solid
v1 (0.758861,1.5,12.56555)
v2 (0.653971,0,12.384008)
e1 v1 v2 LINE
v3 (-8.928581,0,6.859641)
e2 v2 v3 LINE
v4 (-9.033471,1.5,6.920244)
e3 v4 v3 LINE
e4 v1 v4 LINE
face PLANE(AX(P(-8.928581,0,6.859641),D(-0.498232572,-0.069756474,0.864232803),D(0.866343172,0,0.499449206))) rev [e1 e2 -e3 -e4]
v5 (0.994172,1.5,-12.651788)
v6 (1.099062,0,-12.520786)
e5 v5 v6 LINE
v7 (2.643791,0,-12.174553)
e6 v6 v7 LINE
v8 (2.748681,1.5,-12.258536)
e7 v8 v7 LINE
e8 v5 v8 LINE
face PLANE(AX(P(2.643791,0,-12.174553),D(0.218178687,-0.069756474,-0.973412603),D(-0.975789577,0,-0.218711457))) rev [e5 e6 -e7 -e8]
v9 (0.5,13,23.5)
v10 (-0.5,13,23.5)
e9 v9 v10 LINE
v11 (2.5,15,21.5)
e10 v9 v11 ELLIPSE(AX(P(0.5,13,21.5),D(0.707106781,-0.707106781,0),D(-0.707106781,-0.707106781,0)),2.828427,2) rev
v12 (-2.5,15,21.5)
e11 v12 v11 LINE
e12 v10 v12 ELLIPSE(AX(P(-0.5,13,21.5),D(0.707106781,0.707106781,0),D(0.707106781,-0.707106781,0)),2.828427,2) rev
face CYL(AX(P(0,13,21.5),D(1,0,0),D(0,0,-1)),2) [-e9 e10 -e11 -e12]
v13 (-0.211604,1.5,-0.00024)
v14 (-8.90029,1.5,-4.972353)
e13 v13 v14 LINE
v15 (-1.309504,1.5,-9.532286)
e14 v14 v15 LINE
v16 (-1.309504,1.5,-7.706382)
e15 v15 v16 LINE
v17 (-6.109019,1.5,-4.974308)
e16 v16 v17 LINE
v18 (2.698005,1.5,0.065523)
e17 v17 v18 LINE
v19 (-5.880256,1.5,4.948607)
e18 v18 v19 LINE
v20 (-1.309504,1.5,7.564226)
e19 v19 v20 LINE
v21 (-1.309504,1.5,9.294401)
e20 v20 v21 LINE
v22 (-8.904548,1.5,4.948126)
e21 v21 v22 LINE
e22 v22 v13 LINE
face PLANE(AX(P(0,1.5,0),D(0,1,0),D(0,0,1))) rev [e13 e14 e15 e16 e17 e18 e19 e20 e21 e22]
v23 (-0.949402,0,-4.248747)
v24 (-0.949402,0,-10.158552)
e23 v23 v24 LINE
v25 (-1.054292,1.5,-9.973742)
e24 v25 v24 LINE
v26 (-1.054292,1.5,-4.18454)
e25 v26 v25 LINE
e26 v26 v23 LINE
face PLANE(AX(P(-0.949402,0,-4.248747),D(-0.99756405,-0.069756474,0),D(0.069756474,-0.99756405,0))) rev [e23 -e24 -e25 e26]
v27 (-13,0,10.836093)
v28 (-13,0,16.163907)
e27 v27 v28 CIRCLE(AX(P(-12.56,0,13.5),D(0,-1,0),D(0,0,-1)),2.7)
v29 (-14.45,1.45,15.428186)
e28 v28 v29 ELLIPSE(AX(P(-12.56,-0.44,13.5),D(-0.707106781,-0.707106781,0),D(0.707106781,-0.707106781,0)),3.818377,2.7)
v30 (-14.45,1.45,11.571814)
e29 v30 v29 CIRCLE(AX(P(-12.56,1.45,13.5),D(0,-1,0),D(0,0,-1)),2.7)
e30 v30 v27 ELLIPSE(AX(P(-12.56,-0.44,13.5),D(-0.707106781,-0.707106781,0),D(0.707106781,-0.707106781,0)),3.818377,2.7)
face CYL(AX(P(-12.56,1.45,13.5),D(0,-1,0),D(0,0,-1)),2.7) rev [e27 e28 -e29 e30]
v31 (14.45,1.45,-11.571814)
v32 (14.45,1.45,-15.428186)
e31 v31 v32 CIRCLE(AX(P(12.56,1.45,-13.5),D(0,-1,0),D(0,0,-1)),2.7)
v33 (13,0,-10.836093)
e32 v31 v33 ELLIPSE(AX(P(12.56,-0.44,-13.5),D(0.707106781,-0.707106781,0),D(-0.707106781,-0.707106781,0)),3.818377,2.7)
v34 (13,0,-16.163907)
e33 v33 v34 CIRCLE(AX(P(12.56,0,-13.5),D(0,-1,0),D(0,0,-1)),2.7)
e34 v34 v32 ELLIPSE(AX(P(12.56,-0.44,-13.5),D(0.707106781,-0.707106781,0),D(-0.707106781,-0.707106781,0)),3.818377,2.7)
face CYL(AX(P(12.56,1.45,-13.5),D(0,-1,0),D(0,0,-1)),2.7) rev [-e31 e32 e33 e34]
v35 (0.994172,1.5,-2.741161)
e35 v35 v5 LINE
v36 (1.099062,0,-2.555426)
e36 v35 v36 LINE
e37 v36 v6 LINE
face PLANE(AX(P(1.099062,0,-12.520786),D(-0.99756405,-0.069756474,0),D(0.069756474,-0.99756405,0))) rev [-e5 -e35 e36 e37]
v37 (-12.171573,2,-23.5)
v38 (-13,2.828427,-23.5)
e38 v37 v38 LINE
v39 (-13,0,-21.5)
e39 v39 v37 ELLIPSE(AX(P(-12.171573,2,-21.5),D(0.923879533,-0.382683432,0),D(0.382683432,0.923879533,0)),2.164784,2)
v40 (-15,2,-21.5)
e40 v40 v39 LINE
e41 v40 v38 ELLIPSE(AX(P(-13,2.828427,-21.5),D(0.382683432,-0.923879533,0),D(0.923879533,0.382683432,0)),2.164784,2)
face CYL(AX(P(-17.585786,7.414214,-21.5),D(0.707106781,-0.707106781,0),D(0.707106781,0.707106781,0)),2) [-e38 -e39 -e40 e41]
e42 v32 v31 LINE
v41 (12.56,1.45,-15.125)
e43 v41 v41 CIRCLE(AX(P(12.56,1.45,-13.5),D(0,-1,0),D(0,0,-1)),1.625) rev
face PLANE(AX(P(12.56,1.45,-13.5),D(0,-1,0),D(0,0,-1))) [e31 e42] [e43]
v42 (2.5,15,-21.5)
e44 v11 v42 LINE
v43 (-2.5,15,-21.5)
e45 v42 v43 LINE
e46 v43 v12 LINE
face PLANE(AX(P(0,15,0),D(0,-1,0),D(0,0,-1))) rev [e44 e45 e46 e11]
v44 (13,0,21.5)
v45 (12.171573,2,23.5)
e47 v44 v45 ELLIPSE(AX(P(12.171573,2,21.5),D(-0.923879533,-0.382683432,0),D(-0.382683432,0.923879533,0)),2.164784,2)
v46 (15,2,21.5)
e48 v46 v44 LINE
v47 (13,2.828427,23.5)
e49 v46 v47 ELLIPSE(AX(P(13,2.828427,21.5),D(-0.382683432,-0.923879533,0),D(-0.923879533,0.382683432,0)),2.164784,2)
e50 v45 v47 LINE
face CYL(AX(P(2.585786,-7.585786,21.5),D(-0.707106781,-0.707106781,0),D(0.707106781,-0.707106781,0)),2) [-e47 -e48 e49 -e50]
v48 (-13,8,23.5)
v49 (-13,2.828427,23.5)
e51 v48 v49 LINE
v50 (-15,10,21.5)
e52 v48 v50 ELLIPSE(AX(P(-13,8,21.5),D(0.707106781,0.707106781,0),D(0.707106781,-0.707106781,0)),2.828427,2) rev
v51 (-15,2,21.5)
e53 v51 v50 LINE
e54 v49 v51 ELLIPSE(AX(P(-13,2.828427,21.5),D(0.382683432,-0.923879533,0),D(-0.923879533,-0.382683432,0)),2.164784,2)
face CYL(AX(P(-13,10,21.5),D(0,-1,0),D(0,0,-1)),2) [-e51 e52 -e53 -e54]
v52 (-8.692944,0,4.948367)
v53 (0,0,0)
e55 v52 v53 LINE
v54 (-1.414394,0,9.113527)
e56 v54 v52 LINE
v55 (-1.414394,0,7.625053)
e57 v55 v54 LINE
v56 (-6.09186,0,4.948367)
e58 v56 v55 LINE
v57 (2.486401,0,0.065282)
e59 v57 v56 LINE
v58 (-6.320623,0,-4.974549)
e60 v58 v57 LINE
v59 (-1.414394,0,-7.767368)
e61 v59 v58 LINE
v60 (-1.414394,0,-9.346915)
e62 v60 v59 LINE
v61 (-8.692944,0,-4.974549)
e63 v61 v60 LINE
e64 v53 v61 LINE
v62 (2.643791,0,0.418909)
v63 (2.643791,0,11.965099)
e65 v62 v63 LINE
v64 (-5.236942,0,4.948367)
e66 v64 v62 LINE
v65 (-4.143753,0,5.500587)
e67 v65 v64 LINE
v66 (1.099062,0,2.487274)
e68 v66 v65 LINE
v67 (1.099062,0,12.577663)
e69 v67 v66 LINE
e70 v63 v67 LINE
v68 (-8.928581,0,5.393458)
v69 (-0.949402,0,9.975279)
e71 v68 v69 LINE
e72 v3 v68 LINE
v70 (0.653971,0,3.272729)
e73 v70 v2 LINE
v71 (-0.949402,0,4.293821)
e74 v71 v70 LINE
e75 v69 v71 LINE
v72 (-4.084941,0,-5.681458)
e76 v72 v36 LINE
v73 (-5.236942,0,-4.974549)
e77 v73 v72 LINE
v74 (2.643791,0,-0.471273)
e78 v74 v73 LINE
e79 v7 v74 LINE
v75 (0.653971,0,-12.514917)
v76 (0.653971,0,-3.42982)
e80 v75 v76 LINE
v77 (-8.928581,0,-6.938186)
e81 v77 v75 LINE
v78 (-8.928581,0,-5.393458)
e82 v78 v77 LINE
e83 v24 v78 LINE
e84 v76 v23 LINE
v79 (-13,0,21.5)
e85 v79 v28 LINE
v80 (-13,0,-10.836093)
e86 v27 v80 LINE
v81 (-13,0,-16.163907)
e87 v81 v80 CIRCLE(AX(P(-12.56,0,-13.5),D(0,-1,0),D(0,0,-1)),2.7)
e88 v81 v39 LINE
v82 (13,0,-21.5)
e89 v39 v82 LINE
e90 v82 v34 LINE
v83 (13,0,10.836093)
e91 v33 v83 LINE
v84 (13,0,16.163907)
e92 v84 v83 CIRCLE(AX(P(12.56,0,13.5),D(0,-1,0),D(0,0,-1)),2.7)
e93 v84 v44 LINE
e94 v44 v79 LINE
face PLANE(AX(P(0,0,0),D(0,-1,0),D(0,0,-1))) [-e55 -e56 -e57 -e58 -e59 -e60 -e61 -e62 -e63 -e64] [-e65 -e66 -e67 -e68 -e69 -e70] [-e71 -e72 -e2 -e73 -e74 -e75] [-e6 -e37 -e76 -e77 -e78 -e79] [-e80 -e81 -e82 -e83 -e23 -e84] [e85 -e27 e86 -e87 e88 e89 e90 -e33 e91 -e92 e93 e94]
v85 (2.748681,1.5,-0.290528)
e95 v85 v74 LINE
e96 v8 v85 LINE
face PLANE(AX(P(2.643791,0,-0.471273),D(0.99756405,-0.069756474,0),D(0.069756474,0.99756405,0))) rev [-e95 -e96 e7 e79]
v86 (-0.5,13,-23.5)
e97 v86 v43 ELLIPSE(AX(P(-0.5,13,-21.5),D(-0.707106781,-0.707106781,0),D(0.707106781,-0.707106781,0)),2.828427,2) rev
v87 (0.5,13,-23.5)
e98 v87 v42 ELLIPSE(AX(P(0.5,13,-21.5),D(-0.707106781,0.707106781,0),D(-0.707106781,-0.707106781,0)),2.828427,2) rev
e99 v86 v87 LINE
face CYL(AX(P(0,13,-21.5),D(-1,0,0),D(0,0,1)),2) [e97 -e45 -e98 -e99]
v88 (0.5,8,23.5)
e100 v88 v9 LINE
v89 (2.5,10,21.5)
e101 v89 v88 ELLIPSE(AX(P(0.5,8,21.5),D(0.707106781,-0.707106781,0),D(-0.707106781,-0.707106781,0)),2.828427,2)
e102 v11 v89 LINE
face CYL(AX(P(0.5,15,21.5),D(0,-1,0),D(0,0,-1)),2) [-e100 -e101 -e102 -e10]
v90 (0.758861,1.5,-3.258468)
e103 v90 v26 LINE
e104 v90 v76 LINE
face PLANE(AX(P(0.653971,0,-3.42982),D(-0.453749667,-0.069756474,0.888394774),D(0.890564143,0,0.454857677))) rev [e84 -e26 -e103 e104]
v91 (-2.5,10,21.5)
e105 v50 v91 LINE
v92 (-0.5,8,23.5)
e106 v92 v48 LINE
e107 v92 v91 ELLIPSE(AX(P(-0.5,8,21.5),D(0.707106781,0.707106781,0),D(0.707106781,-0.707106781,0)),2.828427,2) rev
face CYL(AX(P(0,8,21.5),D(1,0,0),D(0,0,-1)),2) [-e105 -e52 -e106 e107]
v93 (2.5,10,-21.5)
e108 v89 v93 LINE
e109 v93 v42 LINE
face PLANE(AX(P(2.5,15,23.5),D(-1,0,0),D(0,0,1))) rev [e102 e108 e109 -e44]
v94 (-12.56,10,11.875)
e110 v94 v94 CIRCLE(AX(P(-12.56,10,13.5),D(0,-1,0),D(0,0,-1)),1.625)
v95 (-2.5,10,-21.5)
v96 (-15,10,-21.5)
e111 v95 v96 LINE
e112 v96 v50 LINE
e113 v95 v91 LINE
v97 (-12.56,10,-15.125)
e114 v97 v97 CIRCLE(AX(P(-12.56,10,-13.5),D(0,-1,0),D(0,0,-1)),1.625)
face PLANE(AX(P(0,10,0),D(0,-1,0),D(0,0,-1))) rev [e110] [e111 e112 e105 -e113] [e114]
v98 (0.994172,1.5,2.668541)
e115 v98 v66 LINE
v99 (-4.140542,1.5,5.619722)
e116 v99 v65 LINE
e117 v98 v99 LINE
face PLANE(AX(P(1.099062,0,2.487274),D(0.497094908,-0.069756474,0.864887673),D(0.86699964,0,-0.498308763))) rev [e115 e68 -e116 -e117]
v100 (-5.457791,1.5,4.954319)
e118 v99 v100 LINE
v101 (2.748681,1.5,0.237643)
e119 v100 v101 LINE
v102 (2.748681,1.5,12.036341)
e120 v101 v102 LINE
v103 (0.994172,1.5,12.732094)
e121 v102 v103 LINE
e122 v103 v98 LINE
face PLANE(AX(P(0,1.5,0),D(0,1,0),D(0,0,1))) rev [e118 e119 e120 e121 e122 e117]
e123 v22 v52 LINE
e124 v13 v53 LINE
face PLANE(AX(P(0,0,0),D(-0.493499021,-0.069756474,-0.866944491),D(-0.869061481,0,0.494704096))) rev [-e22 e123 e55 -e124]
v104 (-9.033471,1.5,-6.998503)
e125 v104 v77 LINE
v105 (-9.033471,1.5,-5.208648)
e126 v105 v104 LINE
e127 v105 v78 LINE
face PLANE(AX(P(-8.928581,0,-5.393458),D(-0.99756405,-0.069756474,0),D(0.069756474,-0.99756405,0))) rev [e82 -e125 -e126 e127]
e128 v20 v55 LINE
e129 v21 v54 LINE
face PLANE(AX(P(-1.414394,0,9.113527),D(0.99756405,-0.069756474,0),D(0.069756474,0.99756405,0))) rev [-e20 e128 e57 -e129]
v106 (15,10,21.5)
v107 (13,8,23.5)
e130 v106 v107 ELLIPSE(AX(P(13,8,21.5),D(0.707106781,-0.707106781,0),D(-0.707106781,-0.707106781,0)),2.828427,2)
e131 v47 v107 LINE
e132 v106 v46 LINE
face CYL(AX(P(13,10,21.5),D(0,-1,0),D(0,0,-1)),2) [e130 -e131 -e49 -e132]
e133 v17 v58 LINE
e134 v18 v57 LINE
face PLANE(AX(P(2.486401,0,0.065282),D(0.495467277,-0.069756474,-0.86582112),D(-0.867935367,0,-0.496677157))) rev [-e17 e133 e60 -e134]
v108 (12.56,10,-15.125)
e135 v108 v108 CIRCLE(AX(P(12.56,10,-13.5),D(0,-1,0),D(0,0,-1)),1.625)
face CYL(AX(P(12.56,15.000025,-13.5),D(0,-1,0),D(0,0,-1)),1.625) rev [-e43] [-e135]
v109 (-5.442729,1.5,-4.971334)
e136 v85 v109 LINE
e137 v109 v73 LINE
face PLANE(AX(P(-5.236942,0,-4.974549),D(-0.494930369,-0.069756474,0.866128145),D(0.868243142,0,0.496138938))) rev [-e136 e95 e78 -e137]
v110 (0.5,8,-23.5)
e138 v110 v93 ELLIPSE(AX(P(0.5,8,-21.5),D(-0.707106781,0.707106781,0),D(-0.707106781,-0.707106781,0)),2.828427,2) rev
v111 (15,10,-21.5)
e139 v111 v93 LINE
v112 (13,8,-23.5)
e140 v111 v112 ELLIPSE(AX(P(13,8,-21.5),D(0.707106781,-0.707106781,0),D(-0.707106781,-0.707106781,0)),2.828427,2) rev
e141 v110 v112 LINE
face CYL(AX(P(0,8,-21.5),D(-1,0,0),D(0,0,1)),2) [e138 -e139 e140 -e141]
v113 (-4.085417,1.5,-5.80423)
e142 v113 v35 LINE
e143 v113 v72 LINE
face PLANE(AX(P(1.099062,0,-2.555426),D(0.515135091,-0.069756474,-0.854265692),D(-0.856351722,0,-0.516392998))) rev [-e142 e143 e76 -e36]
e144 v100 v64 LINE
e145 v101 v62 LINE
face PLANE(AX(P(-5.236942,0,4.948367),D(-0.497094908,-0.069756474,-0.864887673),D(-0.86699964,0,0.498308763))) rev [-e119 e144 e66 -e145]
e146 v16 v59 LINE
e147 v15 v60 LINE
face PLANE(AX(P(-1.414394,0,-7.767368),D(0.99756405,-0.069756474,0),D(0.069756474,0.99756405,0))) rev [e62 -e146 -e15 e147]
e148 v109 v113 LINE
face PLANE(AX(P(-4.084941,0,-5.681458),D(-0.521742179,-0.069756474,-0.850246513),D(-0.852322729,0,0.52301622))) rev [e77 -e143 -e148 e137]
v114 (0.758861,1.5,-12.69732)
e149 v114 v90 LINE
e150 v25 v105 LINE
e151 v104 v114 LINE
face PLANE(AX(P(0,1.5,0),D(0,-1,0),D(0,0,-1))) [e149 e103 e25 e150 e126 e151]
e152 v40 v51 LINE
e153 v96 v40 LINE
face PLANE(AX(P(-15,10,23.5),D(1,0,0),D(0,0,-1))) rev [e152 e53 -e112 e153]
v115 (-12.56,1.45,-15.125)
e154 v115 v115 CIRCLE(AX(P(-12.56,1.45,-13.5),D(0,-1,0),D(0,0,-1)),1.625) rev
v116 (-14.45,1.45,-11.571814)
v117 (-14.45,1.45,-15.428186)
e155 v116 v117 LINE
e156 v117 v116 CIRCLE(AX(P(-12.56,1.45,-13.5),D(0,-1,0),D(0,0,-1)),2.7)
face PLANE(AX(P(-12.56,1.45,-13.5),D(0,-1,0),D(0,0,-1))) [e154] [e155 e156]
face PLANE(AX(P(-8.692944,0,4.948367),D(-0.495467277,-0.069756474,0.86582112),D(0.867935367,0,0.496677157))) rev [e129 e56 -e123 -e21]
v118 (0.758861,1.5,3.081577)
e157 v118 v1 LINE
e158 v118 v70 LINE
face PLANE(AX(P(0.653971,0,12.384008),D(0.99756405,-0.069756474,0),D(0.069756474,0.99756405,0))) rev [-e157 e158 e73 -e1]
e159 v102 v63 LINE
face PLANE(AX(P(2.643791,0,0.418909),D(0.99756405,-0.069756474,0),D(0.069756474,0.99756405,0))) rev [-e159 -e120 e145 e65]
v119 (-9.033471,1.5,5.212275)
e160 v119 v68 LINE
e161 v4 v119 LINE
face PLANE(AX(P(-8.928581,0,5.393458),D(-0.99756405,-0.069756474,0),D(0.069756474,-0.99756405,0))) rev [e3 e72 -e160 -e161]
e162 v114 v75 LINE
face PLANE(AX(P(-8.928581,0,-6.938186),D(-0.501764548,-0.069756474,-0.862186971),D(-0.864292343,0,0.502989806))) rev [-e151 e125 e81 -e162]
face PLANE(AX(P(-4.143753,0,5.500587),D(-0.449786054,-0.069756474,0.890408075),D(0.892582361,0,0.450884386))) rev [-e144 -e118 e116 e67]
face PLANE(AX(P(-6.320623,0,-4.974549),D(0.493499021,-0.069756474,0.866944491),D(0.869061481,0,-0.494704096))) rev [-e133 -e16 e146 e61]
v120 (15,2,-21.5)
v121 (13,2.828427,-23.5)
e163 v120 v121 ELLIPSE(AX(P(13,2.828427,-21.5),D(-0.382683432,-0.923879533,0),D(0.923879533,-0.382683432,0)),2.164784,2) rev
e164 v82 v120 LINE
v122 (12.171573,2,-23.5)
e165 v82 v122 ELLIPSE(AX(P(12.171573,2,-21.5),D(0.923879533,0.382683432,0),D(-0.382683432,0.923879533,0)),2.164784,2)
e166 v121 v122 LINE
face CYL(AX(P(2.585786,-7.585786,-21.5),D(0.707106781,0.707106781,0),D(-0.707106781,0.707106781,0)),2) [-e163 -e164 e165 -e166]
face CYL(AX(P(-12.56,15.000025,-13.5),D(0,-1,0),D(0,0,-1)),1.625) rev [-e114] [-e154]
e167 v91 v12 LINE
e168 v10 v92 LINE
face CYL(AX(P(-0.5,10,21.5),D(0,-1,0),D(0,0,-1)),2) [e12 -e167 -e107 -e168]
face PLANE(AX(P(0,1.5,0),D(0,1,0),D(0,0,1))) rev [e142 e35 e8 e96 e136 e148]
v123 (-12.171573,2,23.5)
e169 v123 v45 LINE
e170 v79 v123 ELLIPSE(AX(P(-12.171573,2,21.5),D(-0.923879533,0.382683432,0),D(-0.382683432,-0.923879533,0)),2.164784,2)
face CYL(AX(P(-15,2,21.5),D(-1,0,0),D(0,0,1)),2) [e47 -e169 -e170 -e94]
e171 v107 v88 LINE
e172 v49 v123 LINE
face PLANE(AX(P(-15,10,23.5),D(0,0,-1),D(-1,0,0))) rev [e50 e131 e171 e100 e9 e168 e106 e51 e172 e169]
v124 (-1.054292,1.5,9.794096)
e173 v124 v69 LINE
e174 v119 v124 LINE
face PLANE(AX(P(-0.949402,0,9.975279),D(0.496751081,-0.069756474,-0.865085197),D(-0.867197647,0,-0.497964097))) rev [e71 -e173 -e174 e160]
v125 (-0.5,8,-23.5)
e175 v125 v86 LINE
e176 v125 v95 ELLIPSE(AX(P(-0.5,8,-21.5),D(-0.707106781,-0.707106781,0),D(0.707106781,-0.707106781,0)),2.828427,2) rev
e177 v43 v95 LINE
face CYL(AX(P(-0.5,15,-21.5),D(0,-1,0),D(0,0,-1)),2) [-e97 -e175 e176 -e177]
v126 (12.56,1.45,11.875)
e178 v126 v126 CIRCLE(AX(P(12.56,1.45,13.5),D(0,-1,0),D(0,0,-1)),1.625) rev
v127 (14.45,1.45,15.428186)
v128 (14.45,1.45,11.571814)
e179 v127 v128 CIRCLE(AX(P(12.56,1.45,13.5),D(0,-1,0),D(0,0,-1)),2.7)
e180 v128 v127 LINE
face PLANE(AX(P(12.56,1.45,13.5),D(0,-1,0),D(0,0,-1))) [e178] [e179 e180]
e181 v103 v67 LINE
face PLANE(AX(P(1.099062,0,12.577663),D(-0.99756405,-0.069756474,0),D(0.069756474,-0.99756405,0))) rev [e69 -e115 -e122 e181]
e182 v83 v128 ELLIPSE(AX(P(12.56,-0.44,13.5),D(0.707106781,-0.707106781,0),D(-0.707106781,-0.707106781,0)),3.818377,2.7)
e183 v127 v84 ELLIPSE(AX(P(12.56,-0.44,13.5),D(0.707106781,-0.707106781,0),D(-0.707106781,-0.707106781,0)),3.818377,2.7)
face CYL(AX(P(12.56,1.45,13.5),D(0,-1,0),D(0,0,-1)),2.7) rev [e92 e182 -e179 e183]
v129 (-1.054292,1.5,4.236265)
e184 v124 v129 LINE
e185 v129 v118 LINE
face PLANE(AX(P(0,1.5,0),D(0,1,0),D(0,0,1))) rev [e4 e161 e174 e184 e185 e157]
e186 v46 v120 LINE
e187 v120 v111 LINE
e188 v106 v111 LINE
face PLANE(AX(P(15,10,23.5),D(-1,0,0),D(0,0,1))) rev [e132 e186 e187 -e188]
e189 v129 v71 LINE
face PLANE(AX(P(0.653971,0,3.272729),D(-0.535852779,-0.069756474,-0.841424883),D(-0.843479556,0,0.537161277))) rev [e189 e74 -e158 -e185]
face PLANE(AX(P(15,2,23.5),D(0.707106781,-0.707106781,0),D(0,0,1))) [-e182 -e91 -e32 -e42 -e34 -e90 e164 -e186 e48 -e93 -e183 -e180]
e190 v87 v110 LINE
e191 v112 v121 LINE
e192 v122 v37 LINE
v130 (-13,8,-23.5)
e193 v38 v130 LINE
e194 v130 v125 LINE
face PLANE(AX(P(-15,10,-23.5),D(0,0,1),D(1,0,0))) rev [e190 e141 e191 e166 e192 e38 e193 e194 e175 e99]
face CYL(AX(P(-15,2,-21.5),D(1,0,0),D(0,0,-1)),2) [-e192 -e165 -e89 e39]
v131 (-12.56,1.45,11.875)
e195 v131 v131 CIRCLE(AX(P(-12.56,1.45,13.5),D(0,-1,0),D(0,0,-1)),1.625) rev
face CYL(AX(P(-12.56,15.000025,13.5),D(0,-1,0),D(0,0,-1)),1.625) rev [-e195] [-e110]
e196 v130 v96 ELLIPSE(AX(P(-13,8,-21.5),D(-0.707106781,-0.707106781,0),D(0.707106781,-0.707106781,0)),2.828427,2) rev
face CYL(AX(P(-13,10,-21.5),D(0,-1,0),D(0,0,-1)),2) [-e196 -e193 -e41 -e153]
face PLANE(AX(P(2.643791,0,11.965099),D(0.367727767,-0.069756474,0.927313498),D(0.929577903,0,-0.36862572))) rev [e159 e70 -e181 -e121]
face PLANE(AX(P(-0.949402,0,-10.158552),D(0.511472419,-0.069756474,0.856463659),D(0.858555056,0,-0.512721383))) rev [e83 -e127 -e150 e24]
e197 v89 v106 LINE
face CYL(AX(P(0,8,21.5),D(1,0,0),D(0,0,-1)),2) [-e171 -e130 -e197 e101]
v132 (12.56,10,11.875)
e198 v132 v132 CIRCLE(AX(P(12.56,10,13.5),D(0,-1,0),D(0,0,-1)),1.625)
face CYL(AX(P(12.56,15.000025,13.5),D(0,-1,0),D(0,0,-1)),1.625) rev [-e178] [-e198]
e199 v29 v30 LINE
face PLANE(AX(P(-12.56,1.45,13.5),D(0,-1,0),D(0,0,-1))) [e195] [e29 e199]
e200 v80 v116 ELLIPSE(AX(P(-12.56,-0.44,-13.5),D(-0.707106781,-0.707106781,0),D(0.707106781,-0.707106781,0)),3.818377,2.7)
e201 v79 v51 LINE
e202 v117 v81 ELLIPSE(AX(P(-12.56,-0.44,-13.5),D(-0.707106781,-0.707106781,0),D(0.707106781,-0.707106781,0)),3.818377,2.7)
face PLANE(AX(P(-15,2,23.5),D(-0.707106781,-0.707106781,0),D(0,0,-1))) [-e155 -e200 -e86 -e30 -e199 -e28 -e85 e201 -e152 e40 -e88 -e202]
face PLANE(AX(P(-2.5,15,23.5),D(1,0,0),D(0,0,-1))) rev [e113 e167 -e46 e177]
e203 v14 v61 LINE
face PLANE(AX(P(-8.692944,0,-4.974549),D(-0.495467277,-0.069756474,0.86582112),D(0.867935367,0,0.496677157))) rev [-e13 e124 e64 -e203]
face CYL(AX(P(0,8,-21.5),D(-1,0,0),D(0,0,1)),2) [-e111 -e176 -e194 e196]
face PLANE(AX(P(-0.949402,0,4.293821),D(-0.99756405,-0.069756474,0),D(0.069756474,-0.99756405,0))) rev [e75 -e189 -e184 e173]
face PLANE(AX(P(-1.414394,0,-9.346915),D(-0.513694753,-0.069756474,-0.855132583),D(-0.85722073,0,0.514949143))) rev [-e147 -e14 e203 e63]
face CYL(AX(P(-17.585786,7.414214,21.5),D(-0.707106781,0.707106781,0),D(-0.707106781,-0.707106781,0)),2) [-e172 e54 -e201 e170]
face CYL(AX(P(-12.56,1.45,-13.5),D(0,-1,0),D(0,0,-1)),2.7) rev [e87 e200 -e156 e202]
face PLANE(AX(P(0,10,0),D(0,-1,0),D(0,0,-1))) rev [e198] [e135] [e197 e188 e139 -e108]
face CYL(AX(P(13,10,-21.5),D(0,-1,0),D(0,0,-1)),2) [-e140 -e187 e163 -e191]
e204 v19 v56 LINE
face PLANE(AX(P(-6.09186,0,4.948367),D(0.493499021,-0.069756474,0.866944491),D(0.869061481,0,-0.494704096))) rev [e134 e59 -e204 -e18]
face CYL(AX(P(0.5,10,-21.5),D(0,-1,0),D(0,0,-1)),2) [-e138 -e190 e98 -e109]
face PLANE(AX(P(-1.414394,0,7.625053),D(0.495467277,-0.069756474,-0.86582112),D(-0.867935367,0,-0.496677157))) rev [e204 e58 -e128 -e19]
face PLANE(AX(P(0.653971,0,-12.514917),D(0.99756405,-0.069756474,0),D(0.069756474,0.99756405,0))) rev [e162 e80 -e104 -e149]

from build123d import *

# Parameters (mm, degrees)
SKETCH1_W                    = 30
SKETCH1_H                    = 47
BOSS_EXTRUDE1_DEPTH          = 10
SKETCH2_W                    = 5
SKETCH2_H                    = 47
BOSS_EXTRUDE2_DEPTH          = 5
SKETCH3_R                    = 1.625
CUT_EXTRUDE1_DEPTH           = 32.658332237
SKETCH4_R                    = 2.7
CUT_EXTRUDE2_DEPTH           = 1.45
CHAMFER1_SIZE                = 2
CHAMFER2_SIZE                = 2
FILLET1_R                    = 2
FILLET2_R                    = 2
CUT_EXTRUDE6_DEPTH           = 1.5
CUT_EXTRUDE6_DRAFT           = 4
CUT_EXTRUDE6_PROFILE_2_DEPTH = 1.5
CUT_EXTRUDE6_PROFILE_2_DRAFT = 4
CUT_EXTRUDE6_PROFILE_3_DEPTH = 1.5
CUT_EXTRUDE6_PROFILE_3_DRAFT = 4
CUT_EXTRUDE6_PROFILE_4_DEPTH = 1.5
CUT_EXTRUDE6_PROFILE_4_DRAFT = 4
CUT_EXTRUDE6_PROFILE_5_DEPTH = 1.5
CUT_EXTRUDE6_PROFILE_5_DRAFT = 4


with BuildPart() as part:
    # Sketch1 → Boss-Extrude1 (new body)
    with BuildSketch(Plane(origin=(0, 0, 0), x_dir=(1, 0, 0), z_dir=(0, 1, 0))):
        Rectangle(SKETCH1_W, SKETCH1_H)
    extrude(amount=BOSS_EXTRUDE1_DEPTH)

    # Sketch2 → Boss-Extrude2 (add)
    with BuildSketch(Plane(origin=(0, 10, 0), x_dir=(1, 0, 0), z_dir=(0, 1, 0))):
        Rectangle(SKETCH2_W, SKETCH2_H)
    extrude(amount=BOSS_EXTRUDE2_DEPTH)

    # Sketch3 → Cut-Extrude1 (cut, through all)
    with BuildSketch(Plane.XZ):
        with Locations(Location((-12.56, 13.5, 0), (0, 0, 270))):
            Circle(SKETCH3_R)
        with Locations(Location((-12.56, -13.5, 0), (0, 0, 270))):
            Circle(SKETCH3_R)
        with Locations(Location((12.56, -13.5, 0), (0, 0, 270))):
            Circle(SKETCH3_R)
        with Locations(Location((12.56, 13.5, 0), (0, 0, 270))):
            Circle(SKETCH3_R)
    extrude(amount=-CUT_EXTRUDE1_DEPTH, mode=Mode.SUBTRACT)

    # Sketch4 → Cut-Extrude2 (cut)
    with BuildSketch(Plane.XZ):
        with Locations((-12.56, 13.5)):
            Circle(SKETCH4_R)
        with Locations((-12.56, -13.5)):
            Circle(SKETCH4_R)
        with Locations((12.56, -13.5)):
            Circle(SKETCH4_R)
        with Locations((12.56, 13.5)):
            Circle(SKETCH4_R)
    extrude(amount=-CUT_EXTRUDE2_DEPTH, mode=Mode.SUBTRACT)

    # Chamfer1
    # the kernel refuses this chamfer: 2 mm, written as the material it takes off along each edge
    with BuildSketch(Plane(origin=(-15, 0, -28.643365976), x_dir=(0.9996219169112968, -0.027495876610586365, 0), z_dir=(0, 0, 1)), Plane(origin=(-15, 0, 9.512661705), x_dir=(0.9996219169112968, -0.027495876610586365, 0), z_dir=(0, 0, 1))) as chamfer1_piece_1:
        Polygon((CHAMFER1_SIZE * 0.999621916911, CHAMFER1_SIZE * 0.0274958766106), (-CHAMFER1_SIZE * 0.0274958766106, CHAMFER1_SIZE * 0.999621916911), (0, 0), align=None)
    extrude(amount=19.130704271, mode=Mode.SUBTRACT)
    with BuildSketch(Plane(origin=(-15, 0, -17.487338295), x_dir=(0.9996219169112968, -0.027495876610586365, 0), z_dir=(0, 0, 1))) as chamfer1_piece_2:
        Polygon((CHAMFER1_SIZE * 0.999621916911, CHAMFER1_SIZE * 0.0274958766106), (-CHAMFER1_SIZE * 0.0274958766106, CHAMFER1_SIZE * 0.999621916911), (0, 0), align=None)
    extrude(amount=34.974676589, mode=Mode.SUBTRACT)

    # Chamfer2
    # the kernel refuses this chamfer: 2 mm, written as the material it takes off along each edge
    with BuildSketch(Plane(origin=(15, 0, 28.643365976), x_dir=(0.027495876610586494, 0.9996219169112968, 0), z_dir=(0, 0, -1)), Plane(origin=(15, 0, -9.512661705), x_dir=(0.027495876610586494, 0.9996219169112968, 0), z_dir=(0, 0, -1))) as chamfer2_piece_1:
        Polygon((CHAMFER2_SIZE * 0.999621916911, -CHAMFER2_SIZE * 0.0274958766106), (-CHAMFER2_SIZE * 0.0274958766106, -CHAMFER2_SIZE * 0.999621916911), (0, 0), align=None)
    extrude(amount=19.130704271, mode=Mode.SUBTRACT)
    with BuildSketch(Plane(origin=(15, 0, 17.487338295), x_dir=(0.027495876610586494, 0.9996219169112968, 0), z_dir=(0, 0, -1))) as chamfer2_piece_2:
        Polygon((CHAMFER2_SIZE * 0.999621916911, -CHAMFER2_SIZE * 0.0274958766106), (-CHAMFER2_SIZE * 0.0274958766106, -CHAMFER2_SIZE * 0.999621916911), (0, 0), align=None)
    extrude(amount=34.974676589, mode=Mode.SUBTRACT)

    # Fillet1
    fillet1_edges = [part.edges().sort_by_distance(p)[0] for p in [
        (-14, 1, 23.5),
        (-15, 6, 23.5),
        (-8.75, 10, 23.5),
        (-2.5, 12.5, 23.5),
        (0, 15, 23.5),
        (2.5, 12.5, 23.5),
        (8.75, 10, 23.5),
        (15, 6, 23.5),
        (14, 1, 23.5),
        (0, 0, 23.5),
    ]]
    fillet(fillet1_edges, radius=FILLET1_R)

    # Fillet2
    fillet2_edges = [part.edges().sort_by_distance(p)[0] for p in [
        (8.75, 10, -23.5),
        (2.5, 12.5, -23.5),
        (0, 15, -23.5),
        (-2.5, 12.5, -23.5),
        (-8.75, 10, -23.5),
        (-15, 6, -23.5),
        (-14, 1, -23.5),
        (0, 0, -23.5),
        (14, 1, -23.5),
        (15, 6, -23.5),
    ]]
    fillet(fillet2_edges, radius=FILLET2_R)


with BuildPart() as cut_extrude6_tool:
    # Mobious Logo → Cut-Extrude6 (with draft: the straight prism first)
    with BuildSketch(Plane.XZ):
        Polygon((-8.928580544, -5.393458037), (-8.928580544, -6.93818631), (0.653971114, -12.514917192), (0.653971114, -3.429820402), (-0.949401841, -4.248746813), (-0.949401841, -10.158552031), align=None)
    extrude(amount=-CUT_EXTRUDE6_DEPTH)
    # Cut-Extrude6: the draft: its side faces are tilted about the plane it starts from
    cut_extrude6_sides = [cut_extrude6_tool.faces().sort_by_distance(p)[0] for p in [
        (-8.928580544, 0.75, -6.165822173),
        (-4.137304715, 0.75, -9.726551751),
        (0.653971114, 0.75, -7.972368797),
        (-0.147715364, 0.75, -3.839283608),
        (-0.949401841, 0.75, -7.203649422),
        (-4.938991193, 0.75, -7.776005034),
    ]]
    draft(cut_extrude6_sides, Plane.XZ, CUT_EXTRUDE6_DRAFT)


with BuildPart() as part_1:
    add(part.part)

    # Cut-Extrude6: cut by cut_extrude6_tool
    add(cut_extrude6_tool.part, mode=Mode.SUBTRACT)


with BuildPart() as cut_extrude6_profile_2_tool:
    # Mobious Logo → Cut-Extrude6 profile 2 (with draft: the straight prism first)
    with BuildSketch(Plane.XZ):
        Polygon((-4.084941045, -5.681458223), (1.099062311, -2.555426049), (1.099062311, -12.520785535), (2.643790584, -12.174553336), (2.643790584, -0.471273032), (-5.23694179, -4.974548675), align=None)
    extrude(amount=-CUT_EXTRUDE6_PROFILE_2_DEPTH)
    # Cut-Extrude6 profile 2: the draft: its side faces are tilted about the plane it starts from
    cut_extrude6_profile_2_sides = [cut_extrude6_profile_2_tool.faces().sort_by_distance(p)[0] for p in [
        (-1.492939367, 0.75, -4.118442136),
        (1.099062311, 0.75, -7.538105792),
        (1.871426448, 0.75, -12.347669435),
        (2.643790584, 0.75, -6.322913184),
        (-1.296575603, 0.75, -2.722910854),
        (-4.660941418, 0.75, -5.328003449),
    ]]
    draft(cut_extrude6_profile_2_sides, Plane.XZ, CUT_EXTRUDE6_PROFILE_2_DRAFT)


with BuildPart() as part_2:
    add(part_1.part)

    # Cut-Extrude6 profile 2: cut by cut_extrude6_profile_2_tool
    add(cut_extrude6_profile_2_tool.part, mode=Mode.SUBTRACT)


with BuildPart() as cut_extrude6_profile_3_tool:
    # Mobious Logo → Cut-Extrude6 profile 3 (with draft: the straight prism first)
    with BuildSketch(Plane.XZ):
        Polygon((-1.414393861, -9.346915142), (-1.414393861, -7.767367916), (-6.320622953, -4.974548675), (2.486400923, 0.065282344), (-6.091859658, 4.94836684), (-1.414393861, 7.625052806), (-1.414393861, 9.113526764), (-8.692944028, 4.94836684), (0, 0), (-8.692944028, -4.974548675), align=None)
    extrude(amount=-CUT_EXTRUDE6_PROFILE_3_DEPTH)
    # Cut-Extrude6 profile 3: the draft: its side faces are tilted about the plane it starts from
    cut_extrude6_profile_3_sides = [cut_extrude6_profile_3_tool.faces().sort_by_distance(p)[0] for p in [
        (-1.414393861, 0.75, -8.557141529),
        (-3.867508407, 0.75, -6.370958296),
        (-1.917111015, 0.75, -2.454633165),
        (-1.802729367, 0.75, 2.506824592),
        (-3.75312676, 0.75, 6.286709823),
        (-1.414393861, 0.75, 8.369289785),
        (-5.053668945, 0.75, 7.030946802),
        (-4.346472014, 0.75, 2.47418342),
        (-4.346472014, 0.75, -2.487274337),
        (-5.053668945, 0.75, -7.160731908),
    ]]
    draft(cut_extrude6_profile_3_sides, Plane.XZ, CUT_EXTRUDE6_PROFILE_3_DRAFT)


with BuildPart() as part_3:
    add(part_2.part)

    # Cut-Extrude6 profile 3: cut by cut_extrude6_profile_3_tool
    add(cut_extrude6_profile_3_tool.part, mode=Mode.SUBTRACT)


with BuildPart() as cut_extrude6_profile_4_tool:
    # Mobious Logo → Cut-Extrude6 profile 4 (with draft: the straight prism first)
    with BuildSketch(Plane.XZ):
        Polygon((-8.928580544, 5.393458037), (-0.949401841, 9.975279185), (-0.949401841, 4.293820961), (0.653971114, 3.272729391), (0.653971114, 12.384008017), (-8.928580544, 6.859640804), align=None)
    extrude(amount=-CUT_EXTRUDE6_PROFILE_4_DEPTH)
    # Cut-Extrude6 profile 4: the draft: its side faces are tilted about the plane it starts from
    cut_extrude6_profile_4_sides = [cut_extrude6_profile_4_tool.faces().sort_by_distance(p)[0] for p in [
        (-4.938991193, 0.75, 7.684368611),
        (-0.949401841, 0.75, 7.134550073),
        (-0.147715364, 0.75, 3.783275176),
        (0.653971114, 0.75, 7.828368704),
        (-4.137304715, 0.75, 9.62182441),
        (-8.928580544, 0.75, 6.126549421),
    ]]
    draft(cut_extrude6_profile_4_sides, Plane.XZ, CUT_EXTRUDE6_PROFILE_4_DRAFT)


with BuildPart() as part_4:
    add(part_3.part)

    # Cut-Extrude6 profile 4: cut by cut_extrude6_profile_4_tool
    add(cut_extrude6_profile_4_tool.part, mode=Mode.SUBTRACT)


with BuildPart() as cut_extrude6_profile_5_tool:
    # Mobious Logo → Cut-Extrude6 profile 5 (with draft: the straight prism first)
    with BuildSketch(Plane.XZ):
        Polygon((-5.23694179, 4.94836684), (2.643790584, 0.418909362), (2.643790584, 11.965098655), (1.099062311, 12.577663315), (1.099062311, 2.487274337), (-4.143752967, 5.500586773), align=None)
    extrude(amount=-CUT_EXTRUDE6_PROFILE_5_DEPTH)
    # Cut-Extrude6 profile 5: the draft: its side faces are tilted about the plane it starts from
    cut_extrude6_profile_5_sides = [cut_extrude6_profile_5_tool.faces().sort_by_distance(p)[0] for p in [
        (-1.296575603, 0.75, 2.683638101),
        (2.643790584, 0.75, 6.192004008),
        (1.871426448, 0.75, 12.271380985),
        (1.099062311, 0.75, 7.532468826),
        (-1.522345328, 0.75, 3.993930555),
        (-4.690347379, 0.75, 5.224476806),
    ]]
    draft(cut_extrude6_profile_5_sides, Plane.XZ, CUT_EXTRUDE6_PROFILE_5_DRAFT)


with BuildPart() as part_5:
    add(part_4.part)

    # Cut-Extrude6 profile 5: cut by cut_extrude6_profile_5_tool
    add(cut_extrude6_profile_5_tool.part, mode=Mode.SUBTRACT)


solid = part_5.part
